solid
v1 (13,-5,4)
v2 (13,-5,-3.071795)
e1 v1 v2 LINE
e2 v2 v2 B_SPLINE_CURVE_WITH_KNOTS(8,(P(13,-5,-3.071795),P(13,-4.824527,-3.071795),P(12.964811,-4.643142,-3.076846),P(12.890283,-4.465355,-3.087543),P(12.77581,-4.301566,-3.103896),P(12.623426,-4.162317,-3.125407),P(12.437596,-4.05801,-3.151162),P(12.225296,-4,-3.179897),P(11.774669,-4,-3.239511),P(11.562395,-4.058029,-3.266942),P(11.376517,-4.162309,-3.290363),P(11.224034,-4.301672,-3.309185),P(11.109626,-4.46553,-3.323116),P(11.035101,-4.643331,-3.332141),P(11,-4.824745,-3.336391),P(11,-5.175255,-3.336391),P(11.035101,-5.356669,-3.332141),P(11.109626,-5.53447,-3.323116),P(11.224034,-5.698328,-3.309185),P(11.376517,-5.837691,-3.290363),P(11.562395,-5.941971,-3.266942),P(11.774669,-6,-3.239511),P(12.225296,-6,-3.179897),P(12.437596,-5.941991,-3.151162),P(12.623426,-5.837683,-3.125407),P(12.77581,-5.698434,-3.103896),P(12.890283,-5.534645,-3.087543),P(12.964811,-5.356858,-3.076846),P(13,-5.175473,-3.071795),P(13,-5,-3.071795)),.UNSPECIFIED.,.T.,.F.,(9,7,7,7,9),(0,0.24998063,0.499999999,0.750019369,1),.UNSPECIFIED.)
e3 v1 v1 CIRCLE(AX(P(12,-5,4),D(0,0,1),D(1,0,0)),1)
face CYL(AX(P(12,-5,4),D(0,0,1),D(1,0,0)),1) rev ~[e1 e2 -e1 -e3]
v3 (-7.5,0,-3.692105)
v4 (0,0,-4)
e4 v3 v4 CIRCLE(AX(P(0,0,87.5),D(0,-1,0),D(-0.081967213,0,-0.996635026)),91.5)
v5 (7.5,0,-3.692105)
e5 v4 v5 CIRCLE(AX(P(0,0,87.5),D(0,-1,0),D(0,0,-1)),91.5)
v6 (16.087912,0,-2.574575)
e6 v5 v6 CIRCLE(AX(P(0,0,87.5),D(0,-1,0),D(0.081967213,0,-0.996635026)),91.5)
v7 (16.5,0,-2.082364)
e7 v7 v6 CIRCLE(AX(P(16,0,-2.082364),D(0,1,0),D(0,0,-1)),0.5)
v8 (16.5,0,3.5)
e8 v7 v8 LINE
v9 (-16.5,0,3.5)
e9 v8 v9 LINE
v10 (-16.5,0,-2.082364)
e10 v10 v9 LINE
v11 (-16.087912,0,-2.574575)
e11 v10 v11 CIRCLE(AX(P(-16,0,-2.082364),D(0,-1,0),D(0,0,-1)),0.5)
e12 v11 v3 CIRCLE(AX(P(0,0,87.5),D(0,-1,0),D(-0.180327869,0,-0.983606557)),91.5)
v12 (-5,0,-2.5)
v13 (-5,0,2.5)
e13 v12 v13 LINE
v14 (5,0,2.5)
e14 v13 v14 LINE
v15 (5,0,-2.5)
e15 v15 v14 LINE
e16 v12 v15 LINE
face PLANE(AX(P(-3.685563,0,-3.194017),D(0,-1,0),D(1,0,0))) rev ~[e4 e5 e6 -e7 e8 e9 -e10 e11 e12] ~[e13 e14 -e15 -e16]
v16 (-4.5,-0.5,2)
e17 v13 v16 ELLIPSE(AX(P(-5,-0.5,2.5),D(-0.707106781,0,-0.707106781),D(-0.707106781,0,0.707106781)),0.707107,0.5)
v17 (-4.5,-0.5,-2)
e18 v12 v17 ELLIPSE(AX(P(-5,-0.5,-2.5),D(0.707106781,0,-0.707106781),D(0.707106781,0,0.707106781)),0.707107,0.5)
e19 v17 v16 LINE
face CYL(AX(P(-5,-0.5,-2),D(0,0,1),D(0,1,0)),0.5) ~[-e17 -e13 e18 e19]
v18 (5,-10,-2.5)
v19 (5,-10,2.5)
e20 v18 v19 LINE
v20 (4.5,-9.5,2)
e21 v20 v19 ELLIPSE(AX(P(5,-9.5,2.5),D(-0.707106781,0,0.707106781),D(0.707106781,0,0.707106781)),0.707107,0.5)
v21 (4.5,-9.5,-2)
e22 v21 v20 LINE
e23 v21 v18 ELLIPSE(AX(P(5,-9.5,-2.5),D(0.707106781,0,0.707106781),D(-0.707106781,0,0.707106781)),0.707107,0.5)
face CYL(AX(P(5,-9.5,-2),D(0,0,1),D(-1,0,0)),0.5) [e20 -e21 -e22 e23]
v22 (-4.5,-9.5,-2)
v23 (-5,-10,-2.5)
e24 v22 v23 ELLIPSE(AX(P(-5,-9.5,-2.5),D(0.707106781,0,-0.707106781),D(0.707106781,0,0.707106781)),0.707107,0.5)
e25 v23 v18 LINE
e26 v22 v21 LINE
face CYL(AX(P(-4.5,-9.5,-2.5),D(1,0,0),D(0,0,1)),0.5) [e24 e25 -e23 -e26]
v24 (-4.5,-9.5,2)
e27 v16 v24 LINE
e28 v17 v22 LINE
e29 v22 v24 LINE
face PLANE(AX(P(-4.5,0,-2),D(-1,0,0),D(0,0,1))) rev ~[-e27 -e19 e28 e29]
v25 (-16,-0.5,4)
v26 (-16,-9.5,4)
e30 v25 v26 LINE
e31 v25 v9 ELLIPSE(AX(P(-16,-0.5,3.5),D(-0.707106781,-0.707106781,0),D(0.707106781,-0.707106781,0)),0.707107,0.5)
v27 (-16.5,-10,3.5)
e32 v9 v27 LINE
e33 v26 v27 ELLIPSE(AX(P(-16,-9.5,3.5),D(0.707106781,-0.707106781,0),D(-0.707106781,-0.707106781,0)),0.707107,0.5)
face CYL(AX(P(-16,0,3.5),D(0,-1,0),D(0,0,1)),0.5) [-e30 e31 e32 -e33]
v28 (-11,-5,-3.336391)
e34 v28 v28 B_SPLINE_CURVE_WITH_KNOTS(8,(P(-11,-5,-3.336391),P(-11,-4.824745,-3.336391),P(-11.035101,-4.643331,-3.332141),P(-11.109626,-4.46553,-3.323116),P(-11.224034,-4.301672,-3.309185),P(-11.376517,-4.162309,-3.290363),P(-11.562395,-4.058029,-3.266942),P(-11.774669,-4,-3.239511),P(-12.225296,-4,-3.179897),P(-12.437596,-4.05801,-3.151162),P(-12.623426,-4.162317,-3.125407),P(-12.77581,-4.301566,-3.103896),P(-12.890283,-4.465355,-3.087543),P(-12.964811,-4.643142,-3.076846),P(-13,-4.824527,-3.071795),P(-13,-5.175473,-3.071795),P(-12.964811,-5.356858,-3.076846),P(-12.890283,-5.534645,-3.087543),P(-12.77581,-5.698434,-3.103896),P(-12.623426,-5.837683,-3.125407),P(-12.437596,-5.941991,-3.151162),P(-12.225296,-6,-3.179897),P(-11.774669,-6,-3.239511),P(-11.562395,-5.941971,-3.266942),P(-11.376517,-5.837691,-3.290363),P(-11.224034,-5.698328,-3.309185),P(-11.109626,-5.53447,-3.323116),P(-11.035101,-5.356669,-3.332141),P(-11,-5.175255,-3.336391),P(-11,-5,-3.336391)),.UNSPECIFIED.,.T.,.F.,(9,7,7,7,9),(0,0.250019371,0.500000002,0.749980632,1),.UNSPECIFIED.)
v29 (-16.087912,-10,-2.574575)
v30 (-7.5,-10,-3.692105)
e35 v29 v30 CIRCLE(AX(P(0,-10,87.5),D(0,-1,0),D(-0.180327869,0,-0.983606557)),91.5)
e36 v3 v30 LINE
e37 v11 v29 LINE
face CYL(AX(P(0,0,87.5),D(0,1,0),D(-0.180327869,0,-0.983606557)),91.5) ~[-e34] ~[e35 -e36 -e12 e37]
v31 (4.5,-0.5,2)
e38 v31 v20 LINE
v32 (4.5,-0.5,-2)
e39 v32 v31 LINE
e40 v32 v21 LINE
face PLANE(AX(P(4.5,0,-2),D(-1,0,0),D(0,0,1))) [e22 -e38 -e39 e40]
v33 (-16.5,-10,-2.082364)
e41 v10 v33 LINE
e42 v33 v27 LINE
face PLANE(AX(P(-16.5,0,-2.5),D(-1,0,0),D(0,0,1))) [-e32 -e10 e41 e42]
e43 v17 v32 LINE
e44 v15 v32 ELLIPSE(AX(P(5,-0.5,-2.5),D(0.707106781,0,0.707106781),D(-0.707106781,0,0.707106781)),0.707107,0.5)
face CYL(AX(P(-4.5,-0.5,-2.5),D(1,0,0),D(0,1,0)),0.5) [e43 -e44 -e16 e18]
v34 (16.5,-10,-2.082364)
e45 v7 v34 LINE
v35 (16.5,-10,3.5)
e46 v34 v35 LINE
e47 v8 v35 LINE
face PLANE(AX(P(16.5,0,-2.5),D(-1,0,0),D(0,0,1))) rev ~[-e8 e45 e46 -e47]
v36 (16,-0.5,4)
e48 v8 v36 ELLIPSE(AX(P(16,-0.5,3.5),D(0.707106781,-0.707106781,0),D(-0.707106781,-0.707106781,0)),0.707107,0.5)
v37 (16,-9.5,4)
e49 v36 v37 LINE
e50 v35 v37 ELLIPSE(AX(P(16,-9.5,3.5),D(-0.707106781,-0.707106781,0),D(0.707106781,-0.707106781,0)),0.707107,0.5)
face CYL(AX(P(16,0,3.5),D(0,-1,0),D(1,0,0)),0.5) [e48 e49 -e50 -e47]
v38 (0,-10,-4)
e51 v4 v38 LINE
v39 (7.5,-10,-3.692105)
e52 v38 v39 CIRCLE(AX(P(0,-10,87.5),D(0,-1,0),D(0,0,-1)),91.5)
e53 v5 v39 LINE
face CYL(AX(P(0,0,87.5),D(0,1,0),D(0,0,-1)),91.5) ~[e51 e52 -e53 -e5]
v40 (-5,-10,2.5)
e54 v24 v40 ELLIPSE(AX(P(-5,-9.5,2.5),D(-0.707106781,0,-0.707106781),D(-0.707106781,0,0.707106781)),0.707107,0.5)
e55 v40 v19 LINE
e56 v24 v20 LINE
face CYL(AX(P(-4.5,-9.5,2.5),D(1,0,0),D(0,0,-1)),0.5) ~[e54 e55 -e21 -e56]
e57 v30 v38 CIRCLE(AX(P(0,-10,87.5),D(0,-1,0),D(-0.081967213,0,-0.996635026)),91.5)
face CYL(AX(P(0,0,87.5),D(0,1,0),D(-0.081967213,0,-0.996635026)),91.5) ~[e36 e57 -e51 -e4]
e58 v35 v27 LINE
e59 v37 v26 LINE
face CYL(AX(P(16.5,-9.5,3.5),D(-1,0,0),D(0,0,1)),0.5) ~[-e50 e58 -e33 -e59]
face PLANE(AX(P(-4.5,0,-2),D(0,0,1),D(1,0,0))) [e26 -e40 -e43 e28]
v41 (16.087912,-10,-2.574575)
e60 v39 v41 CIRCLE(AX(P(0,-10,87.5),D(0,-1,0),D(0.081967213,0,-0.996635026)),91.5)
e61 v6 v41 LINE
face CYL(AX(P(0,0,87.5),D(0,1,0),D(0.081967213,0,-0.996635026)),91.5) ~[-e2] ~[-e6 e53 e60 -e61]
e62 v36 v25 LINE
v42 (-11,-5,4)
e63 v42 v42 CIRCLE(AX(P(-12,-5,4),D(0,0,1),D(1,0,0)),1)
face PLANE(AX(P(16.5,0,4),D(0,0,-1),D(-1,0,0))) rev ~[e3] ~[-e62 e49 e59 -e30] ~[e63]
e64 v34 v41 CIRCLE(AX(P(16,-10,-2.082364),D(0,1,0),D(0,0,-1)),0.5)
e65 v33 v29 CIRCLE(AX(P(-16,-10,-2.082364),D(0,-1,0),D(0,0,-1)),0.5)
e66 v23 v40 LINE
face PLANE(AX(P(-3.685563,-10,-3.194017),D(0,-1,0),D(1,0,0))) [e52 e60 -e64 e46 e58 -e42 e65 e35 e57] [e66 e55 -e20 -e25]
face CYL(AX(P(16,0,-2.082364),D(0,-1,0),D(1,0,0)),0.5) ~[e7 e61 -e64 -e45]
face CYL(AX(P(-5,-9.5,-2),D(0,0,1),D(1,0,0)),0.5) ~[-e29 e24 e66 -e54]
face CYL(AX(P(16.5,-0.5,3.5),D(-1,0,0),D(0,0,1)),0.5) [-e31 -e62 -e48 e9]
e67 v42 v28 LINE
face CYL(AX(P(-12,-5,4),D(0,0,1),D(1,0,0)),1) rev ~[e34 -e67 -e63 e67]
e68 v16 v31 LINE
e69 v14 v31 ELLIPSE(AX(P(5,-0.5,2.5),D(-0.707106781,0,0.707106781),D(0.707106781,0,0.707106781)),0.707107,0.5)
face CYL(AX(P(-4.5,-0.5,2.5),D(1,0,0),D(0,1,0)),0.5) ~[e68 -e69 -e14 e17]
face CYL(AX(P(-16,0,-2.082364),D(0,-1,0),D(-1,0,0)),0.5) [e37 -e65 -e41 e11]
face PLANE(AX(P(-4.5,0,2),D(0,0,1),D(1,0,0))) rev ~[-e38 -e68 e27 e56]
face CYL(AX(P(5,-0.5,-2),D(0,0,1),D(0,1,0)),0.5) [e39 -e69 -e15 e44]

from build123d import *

# Parameters (mm, degrees)
F0_W     = 9
F0_H     = 4
F0_H_2   = 6.5
F1_DEPTH = 10
F2_R     = 0.5
F3_R     = 1
F4_DEPTH = 25


with BuildPart() as f1:
    # F0 (on Front) → F1 (new body)
    with BuildSketch(Plane.XZ):
        with BuildLine():
            ThreePointArc((-7.5, -3.6921049214), (-3.753158649, -3.9229938263), (0, -4))
            Line((0, -4), (0, -2.5))
            Line((0, -2.5), (-7.5, -2.5))
            Line((-7.5, -2.5), (-7.5, -3.6921049214))
        make_face()
        with BuildLine():
            Line((0, -2.5), (0, -4))
            ThreePointArc((0, -4), (3.753158649, -3.9229938263), (7.5, -3.6921049214))
            Line((7.5, -3.6921049214), (7.5, -2.5))
            Line((7.5, -2.5), (0, -2.5))
        make_face()
        with BuildLine():
            Line((7.5, -2.5), (7.5, -3.6921049214))
            ThreePointArc((7.5, -3.6921049214), (12.0147941529, -3.2077434482), (16.5, -2.5))
            Line((16.5, -2.5), (7.5, -2.5))
        make_face()
        Polygon((-7.5, -2.5), (0, -2.5), (7.5, -2.5), (7.5, 4), (-7.5, 4), align=None)
        Rectangle(F0_W, F0_H, mode=Mode.SUBTRACT)
        with BuildLine():
            ThreePointArc((-16.5, -2.5), (-12.0147941529, -3.2077434482), (-7.5, -3.6921049214))
            Line((-7.5, -3.6921049214), (-7.5, -2.5))
            Line((-7.5, -2.5), (-16.5, -2.5))
        make_face()
        with Locations((12, 0.75)):
            Rectangle(F0_W, F0_H_2)
        with Locations((-12, 0.75)):
            Rectangle(F0_W, F0_H_2)
    extrude(amount=F1_DEPTH)

    # F2 (call 1 of 5: OpenCascade refuses the feature's edges together)
    f2_edges = [f1.edges().sort_by_distance(p)[0] for p in [
        (16.5, -5, 4),
        (-16.5, -5, 4),
        (0, -10, 4),
        (0, 0, 4),
    ]]
    fillet(f2_edges, radius=F2_R)

    # F2#2 (call 2 of 5)
    f2_2_edges = [f1.edges().sort_by_distance(p)[0] for p in [
        (16.5, -5, -2.5),
    ]]
    fillet(f2_2_edges, radius=F2_R)

    # F2#3 (call 3 of 5)
    f2_3_edges = [f1.edges().sort_by_distance(p)[0] for p in [
        (-16.5, -5, -2.5),
    ]]
    fillet(f2_3_edges, radius=F2_R)

    # F2#4 (call 4 of 5)
    f2_4_edges = [f1.edges().sort_by_distance(p)[0] for p in [
        (-4.5, 0, 0),
        (0, 0, 2),
        (4.5, 0, 0),
        (0, 0, -2),
    ]]
    fillet(f2_4_edges, radius=F2_R)

    # F2#5 (call 5 of 5)
    f2_5_edges = [f1.edges().sort_by_distance(p)[0] for p in [
        (-4.5, -10, 0),
        (0, -10, 2),
        (4.5, -10, 0),
        (0, -10, -2),
    ]]
    fillet(f2_5_edges, radius=F2_R)

    # F3 (on face) → F4 (cut)
    with BuildSketch(Plane.XY.offset(4)):
        with Locations((-12, -5)):
            Circle(F3_R)
        with Locations((12, -5)):
            Circle(F3_R)
    extrude(amount=-F4_DEPTH, mode=Mode.SUBTRACT)


solid = f1.part
